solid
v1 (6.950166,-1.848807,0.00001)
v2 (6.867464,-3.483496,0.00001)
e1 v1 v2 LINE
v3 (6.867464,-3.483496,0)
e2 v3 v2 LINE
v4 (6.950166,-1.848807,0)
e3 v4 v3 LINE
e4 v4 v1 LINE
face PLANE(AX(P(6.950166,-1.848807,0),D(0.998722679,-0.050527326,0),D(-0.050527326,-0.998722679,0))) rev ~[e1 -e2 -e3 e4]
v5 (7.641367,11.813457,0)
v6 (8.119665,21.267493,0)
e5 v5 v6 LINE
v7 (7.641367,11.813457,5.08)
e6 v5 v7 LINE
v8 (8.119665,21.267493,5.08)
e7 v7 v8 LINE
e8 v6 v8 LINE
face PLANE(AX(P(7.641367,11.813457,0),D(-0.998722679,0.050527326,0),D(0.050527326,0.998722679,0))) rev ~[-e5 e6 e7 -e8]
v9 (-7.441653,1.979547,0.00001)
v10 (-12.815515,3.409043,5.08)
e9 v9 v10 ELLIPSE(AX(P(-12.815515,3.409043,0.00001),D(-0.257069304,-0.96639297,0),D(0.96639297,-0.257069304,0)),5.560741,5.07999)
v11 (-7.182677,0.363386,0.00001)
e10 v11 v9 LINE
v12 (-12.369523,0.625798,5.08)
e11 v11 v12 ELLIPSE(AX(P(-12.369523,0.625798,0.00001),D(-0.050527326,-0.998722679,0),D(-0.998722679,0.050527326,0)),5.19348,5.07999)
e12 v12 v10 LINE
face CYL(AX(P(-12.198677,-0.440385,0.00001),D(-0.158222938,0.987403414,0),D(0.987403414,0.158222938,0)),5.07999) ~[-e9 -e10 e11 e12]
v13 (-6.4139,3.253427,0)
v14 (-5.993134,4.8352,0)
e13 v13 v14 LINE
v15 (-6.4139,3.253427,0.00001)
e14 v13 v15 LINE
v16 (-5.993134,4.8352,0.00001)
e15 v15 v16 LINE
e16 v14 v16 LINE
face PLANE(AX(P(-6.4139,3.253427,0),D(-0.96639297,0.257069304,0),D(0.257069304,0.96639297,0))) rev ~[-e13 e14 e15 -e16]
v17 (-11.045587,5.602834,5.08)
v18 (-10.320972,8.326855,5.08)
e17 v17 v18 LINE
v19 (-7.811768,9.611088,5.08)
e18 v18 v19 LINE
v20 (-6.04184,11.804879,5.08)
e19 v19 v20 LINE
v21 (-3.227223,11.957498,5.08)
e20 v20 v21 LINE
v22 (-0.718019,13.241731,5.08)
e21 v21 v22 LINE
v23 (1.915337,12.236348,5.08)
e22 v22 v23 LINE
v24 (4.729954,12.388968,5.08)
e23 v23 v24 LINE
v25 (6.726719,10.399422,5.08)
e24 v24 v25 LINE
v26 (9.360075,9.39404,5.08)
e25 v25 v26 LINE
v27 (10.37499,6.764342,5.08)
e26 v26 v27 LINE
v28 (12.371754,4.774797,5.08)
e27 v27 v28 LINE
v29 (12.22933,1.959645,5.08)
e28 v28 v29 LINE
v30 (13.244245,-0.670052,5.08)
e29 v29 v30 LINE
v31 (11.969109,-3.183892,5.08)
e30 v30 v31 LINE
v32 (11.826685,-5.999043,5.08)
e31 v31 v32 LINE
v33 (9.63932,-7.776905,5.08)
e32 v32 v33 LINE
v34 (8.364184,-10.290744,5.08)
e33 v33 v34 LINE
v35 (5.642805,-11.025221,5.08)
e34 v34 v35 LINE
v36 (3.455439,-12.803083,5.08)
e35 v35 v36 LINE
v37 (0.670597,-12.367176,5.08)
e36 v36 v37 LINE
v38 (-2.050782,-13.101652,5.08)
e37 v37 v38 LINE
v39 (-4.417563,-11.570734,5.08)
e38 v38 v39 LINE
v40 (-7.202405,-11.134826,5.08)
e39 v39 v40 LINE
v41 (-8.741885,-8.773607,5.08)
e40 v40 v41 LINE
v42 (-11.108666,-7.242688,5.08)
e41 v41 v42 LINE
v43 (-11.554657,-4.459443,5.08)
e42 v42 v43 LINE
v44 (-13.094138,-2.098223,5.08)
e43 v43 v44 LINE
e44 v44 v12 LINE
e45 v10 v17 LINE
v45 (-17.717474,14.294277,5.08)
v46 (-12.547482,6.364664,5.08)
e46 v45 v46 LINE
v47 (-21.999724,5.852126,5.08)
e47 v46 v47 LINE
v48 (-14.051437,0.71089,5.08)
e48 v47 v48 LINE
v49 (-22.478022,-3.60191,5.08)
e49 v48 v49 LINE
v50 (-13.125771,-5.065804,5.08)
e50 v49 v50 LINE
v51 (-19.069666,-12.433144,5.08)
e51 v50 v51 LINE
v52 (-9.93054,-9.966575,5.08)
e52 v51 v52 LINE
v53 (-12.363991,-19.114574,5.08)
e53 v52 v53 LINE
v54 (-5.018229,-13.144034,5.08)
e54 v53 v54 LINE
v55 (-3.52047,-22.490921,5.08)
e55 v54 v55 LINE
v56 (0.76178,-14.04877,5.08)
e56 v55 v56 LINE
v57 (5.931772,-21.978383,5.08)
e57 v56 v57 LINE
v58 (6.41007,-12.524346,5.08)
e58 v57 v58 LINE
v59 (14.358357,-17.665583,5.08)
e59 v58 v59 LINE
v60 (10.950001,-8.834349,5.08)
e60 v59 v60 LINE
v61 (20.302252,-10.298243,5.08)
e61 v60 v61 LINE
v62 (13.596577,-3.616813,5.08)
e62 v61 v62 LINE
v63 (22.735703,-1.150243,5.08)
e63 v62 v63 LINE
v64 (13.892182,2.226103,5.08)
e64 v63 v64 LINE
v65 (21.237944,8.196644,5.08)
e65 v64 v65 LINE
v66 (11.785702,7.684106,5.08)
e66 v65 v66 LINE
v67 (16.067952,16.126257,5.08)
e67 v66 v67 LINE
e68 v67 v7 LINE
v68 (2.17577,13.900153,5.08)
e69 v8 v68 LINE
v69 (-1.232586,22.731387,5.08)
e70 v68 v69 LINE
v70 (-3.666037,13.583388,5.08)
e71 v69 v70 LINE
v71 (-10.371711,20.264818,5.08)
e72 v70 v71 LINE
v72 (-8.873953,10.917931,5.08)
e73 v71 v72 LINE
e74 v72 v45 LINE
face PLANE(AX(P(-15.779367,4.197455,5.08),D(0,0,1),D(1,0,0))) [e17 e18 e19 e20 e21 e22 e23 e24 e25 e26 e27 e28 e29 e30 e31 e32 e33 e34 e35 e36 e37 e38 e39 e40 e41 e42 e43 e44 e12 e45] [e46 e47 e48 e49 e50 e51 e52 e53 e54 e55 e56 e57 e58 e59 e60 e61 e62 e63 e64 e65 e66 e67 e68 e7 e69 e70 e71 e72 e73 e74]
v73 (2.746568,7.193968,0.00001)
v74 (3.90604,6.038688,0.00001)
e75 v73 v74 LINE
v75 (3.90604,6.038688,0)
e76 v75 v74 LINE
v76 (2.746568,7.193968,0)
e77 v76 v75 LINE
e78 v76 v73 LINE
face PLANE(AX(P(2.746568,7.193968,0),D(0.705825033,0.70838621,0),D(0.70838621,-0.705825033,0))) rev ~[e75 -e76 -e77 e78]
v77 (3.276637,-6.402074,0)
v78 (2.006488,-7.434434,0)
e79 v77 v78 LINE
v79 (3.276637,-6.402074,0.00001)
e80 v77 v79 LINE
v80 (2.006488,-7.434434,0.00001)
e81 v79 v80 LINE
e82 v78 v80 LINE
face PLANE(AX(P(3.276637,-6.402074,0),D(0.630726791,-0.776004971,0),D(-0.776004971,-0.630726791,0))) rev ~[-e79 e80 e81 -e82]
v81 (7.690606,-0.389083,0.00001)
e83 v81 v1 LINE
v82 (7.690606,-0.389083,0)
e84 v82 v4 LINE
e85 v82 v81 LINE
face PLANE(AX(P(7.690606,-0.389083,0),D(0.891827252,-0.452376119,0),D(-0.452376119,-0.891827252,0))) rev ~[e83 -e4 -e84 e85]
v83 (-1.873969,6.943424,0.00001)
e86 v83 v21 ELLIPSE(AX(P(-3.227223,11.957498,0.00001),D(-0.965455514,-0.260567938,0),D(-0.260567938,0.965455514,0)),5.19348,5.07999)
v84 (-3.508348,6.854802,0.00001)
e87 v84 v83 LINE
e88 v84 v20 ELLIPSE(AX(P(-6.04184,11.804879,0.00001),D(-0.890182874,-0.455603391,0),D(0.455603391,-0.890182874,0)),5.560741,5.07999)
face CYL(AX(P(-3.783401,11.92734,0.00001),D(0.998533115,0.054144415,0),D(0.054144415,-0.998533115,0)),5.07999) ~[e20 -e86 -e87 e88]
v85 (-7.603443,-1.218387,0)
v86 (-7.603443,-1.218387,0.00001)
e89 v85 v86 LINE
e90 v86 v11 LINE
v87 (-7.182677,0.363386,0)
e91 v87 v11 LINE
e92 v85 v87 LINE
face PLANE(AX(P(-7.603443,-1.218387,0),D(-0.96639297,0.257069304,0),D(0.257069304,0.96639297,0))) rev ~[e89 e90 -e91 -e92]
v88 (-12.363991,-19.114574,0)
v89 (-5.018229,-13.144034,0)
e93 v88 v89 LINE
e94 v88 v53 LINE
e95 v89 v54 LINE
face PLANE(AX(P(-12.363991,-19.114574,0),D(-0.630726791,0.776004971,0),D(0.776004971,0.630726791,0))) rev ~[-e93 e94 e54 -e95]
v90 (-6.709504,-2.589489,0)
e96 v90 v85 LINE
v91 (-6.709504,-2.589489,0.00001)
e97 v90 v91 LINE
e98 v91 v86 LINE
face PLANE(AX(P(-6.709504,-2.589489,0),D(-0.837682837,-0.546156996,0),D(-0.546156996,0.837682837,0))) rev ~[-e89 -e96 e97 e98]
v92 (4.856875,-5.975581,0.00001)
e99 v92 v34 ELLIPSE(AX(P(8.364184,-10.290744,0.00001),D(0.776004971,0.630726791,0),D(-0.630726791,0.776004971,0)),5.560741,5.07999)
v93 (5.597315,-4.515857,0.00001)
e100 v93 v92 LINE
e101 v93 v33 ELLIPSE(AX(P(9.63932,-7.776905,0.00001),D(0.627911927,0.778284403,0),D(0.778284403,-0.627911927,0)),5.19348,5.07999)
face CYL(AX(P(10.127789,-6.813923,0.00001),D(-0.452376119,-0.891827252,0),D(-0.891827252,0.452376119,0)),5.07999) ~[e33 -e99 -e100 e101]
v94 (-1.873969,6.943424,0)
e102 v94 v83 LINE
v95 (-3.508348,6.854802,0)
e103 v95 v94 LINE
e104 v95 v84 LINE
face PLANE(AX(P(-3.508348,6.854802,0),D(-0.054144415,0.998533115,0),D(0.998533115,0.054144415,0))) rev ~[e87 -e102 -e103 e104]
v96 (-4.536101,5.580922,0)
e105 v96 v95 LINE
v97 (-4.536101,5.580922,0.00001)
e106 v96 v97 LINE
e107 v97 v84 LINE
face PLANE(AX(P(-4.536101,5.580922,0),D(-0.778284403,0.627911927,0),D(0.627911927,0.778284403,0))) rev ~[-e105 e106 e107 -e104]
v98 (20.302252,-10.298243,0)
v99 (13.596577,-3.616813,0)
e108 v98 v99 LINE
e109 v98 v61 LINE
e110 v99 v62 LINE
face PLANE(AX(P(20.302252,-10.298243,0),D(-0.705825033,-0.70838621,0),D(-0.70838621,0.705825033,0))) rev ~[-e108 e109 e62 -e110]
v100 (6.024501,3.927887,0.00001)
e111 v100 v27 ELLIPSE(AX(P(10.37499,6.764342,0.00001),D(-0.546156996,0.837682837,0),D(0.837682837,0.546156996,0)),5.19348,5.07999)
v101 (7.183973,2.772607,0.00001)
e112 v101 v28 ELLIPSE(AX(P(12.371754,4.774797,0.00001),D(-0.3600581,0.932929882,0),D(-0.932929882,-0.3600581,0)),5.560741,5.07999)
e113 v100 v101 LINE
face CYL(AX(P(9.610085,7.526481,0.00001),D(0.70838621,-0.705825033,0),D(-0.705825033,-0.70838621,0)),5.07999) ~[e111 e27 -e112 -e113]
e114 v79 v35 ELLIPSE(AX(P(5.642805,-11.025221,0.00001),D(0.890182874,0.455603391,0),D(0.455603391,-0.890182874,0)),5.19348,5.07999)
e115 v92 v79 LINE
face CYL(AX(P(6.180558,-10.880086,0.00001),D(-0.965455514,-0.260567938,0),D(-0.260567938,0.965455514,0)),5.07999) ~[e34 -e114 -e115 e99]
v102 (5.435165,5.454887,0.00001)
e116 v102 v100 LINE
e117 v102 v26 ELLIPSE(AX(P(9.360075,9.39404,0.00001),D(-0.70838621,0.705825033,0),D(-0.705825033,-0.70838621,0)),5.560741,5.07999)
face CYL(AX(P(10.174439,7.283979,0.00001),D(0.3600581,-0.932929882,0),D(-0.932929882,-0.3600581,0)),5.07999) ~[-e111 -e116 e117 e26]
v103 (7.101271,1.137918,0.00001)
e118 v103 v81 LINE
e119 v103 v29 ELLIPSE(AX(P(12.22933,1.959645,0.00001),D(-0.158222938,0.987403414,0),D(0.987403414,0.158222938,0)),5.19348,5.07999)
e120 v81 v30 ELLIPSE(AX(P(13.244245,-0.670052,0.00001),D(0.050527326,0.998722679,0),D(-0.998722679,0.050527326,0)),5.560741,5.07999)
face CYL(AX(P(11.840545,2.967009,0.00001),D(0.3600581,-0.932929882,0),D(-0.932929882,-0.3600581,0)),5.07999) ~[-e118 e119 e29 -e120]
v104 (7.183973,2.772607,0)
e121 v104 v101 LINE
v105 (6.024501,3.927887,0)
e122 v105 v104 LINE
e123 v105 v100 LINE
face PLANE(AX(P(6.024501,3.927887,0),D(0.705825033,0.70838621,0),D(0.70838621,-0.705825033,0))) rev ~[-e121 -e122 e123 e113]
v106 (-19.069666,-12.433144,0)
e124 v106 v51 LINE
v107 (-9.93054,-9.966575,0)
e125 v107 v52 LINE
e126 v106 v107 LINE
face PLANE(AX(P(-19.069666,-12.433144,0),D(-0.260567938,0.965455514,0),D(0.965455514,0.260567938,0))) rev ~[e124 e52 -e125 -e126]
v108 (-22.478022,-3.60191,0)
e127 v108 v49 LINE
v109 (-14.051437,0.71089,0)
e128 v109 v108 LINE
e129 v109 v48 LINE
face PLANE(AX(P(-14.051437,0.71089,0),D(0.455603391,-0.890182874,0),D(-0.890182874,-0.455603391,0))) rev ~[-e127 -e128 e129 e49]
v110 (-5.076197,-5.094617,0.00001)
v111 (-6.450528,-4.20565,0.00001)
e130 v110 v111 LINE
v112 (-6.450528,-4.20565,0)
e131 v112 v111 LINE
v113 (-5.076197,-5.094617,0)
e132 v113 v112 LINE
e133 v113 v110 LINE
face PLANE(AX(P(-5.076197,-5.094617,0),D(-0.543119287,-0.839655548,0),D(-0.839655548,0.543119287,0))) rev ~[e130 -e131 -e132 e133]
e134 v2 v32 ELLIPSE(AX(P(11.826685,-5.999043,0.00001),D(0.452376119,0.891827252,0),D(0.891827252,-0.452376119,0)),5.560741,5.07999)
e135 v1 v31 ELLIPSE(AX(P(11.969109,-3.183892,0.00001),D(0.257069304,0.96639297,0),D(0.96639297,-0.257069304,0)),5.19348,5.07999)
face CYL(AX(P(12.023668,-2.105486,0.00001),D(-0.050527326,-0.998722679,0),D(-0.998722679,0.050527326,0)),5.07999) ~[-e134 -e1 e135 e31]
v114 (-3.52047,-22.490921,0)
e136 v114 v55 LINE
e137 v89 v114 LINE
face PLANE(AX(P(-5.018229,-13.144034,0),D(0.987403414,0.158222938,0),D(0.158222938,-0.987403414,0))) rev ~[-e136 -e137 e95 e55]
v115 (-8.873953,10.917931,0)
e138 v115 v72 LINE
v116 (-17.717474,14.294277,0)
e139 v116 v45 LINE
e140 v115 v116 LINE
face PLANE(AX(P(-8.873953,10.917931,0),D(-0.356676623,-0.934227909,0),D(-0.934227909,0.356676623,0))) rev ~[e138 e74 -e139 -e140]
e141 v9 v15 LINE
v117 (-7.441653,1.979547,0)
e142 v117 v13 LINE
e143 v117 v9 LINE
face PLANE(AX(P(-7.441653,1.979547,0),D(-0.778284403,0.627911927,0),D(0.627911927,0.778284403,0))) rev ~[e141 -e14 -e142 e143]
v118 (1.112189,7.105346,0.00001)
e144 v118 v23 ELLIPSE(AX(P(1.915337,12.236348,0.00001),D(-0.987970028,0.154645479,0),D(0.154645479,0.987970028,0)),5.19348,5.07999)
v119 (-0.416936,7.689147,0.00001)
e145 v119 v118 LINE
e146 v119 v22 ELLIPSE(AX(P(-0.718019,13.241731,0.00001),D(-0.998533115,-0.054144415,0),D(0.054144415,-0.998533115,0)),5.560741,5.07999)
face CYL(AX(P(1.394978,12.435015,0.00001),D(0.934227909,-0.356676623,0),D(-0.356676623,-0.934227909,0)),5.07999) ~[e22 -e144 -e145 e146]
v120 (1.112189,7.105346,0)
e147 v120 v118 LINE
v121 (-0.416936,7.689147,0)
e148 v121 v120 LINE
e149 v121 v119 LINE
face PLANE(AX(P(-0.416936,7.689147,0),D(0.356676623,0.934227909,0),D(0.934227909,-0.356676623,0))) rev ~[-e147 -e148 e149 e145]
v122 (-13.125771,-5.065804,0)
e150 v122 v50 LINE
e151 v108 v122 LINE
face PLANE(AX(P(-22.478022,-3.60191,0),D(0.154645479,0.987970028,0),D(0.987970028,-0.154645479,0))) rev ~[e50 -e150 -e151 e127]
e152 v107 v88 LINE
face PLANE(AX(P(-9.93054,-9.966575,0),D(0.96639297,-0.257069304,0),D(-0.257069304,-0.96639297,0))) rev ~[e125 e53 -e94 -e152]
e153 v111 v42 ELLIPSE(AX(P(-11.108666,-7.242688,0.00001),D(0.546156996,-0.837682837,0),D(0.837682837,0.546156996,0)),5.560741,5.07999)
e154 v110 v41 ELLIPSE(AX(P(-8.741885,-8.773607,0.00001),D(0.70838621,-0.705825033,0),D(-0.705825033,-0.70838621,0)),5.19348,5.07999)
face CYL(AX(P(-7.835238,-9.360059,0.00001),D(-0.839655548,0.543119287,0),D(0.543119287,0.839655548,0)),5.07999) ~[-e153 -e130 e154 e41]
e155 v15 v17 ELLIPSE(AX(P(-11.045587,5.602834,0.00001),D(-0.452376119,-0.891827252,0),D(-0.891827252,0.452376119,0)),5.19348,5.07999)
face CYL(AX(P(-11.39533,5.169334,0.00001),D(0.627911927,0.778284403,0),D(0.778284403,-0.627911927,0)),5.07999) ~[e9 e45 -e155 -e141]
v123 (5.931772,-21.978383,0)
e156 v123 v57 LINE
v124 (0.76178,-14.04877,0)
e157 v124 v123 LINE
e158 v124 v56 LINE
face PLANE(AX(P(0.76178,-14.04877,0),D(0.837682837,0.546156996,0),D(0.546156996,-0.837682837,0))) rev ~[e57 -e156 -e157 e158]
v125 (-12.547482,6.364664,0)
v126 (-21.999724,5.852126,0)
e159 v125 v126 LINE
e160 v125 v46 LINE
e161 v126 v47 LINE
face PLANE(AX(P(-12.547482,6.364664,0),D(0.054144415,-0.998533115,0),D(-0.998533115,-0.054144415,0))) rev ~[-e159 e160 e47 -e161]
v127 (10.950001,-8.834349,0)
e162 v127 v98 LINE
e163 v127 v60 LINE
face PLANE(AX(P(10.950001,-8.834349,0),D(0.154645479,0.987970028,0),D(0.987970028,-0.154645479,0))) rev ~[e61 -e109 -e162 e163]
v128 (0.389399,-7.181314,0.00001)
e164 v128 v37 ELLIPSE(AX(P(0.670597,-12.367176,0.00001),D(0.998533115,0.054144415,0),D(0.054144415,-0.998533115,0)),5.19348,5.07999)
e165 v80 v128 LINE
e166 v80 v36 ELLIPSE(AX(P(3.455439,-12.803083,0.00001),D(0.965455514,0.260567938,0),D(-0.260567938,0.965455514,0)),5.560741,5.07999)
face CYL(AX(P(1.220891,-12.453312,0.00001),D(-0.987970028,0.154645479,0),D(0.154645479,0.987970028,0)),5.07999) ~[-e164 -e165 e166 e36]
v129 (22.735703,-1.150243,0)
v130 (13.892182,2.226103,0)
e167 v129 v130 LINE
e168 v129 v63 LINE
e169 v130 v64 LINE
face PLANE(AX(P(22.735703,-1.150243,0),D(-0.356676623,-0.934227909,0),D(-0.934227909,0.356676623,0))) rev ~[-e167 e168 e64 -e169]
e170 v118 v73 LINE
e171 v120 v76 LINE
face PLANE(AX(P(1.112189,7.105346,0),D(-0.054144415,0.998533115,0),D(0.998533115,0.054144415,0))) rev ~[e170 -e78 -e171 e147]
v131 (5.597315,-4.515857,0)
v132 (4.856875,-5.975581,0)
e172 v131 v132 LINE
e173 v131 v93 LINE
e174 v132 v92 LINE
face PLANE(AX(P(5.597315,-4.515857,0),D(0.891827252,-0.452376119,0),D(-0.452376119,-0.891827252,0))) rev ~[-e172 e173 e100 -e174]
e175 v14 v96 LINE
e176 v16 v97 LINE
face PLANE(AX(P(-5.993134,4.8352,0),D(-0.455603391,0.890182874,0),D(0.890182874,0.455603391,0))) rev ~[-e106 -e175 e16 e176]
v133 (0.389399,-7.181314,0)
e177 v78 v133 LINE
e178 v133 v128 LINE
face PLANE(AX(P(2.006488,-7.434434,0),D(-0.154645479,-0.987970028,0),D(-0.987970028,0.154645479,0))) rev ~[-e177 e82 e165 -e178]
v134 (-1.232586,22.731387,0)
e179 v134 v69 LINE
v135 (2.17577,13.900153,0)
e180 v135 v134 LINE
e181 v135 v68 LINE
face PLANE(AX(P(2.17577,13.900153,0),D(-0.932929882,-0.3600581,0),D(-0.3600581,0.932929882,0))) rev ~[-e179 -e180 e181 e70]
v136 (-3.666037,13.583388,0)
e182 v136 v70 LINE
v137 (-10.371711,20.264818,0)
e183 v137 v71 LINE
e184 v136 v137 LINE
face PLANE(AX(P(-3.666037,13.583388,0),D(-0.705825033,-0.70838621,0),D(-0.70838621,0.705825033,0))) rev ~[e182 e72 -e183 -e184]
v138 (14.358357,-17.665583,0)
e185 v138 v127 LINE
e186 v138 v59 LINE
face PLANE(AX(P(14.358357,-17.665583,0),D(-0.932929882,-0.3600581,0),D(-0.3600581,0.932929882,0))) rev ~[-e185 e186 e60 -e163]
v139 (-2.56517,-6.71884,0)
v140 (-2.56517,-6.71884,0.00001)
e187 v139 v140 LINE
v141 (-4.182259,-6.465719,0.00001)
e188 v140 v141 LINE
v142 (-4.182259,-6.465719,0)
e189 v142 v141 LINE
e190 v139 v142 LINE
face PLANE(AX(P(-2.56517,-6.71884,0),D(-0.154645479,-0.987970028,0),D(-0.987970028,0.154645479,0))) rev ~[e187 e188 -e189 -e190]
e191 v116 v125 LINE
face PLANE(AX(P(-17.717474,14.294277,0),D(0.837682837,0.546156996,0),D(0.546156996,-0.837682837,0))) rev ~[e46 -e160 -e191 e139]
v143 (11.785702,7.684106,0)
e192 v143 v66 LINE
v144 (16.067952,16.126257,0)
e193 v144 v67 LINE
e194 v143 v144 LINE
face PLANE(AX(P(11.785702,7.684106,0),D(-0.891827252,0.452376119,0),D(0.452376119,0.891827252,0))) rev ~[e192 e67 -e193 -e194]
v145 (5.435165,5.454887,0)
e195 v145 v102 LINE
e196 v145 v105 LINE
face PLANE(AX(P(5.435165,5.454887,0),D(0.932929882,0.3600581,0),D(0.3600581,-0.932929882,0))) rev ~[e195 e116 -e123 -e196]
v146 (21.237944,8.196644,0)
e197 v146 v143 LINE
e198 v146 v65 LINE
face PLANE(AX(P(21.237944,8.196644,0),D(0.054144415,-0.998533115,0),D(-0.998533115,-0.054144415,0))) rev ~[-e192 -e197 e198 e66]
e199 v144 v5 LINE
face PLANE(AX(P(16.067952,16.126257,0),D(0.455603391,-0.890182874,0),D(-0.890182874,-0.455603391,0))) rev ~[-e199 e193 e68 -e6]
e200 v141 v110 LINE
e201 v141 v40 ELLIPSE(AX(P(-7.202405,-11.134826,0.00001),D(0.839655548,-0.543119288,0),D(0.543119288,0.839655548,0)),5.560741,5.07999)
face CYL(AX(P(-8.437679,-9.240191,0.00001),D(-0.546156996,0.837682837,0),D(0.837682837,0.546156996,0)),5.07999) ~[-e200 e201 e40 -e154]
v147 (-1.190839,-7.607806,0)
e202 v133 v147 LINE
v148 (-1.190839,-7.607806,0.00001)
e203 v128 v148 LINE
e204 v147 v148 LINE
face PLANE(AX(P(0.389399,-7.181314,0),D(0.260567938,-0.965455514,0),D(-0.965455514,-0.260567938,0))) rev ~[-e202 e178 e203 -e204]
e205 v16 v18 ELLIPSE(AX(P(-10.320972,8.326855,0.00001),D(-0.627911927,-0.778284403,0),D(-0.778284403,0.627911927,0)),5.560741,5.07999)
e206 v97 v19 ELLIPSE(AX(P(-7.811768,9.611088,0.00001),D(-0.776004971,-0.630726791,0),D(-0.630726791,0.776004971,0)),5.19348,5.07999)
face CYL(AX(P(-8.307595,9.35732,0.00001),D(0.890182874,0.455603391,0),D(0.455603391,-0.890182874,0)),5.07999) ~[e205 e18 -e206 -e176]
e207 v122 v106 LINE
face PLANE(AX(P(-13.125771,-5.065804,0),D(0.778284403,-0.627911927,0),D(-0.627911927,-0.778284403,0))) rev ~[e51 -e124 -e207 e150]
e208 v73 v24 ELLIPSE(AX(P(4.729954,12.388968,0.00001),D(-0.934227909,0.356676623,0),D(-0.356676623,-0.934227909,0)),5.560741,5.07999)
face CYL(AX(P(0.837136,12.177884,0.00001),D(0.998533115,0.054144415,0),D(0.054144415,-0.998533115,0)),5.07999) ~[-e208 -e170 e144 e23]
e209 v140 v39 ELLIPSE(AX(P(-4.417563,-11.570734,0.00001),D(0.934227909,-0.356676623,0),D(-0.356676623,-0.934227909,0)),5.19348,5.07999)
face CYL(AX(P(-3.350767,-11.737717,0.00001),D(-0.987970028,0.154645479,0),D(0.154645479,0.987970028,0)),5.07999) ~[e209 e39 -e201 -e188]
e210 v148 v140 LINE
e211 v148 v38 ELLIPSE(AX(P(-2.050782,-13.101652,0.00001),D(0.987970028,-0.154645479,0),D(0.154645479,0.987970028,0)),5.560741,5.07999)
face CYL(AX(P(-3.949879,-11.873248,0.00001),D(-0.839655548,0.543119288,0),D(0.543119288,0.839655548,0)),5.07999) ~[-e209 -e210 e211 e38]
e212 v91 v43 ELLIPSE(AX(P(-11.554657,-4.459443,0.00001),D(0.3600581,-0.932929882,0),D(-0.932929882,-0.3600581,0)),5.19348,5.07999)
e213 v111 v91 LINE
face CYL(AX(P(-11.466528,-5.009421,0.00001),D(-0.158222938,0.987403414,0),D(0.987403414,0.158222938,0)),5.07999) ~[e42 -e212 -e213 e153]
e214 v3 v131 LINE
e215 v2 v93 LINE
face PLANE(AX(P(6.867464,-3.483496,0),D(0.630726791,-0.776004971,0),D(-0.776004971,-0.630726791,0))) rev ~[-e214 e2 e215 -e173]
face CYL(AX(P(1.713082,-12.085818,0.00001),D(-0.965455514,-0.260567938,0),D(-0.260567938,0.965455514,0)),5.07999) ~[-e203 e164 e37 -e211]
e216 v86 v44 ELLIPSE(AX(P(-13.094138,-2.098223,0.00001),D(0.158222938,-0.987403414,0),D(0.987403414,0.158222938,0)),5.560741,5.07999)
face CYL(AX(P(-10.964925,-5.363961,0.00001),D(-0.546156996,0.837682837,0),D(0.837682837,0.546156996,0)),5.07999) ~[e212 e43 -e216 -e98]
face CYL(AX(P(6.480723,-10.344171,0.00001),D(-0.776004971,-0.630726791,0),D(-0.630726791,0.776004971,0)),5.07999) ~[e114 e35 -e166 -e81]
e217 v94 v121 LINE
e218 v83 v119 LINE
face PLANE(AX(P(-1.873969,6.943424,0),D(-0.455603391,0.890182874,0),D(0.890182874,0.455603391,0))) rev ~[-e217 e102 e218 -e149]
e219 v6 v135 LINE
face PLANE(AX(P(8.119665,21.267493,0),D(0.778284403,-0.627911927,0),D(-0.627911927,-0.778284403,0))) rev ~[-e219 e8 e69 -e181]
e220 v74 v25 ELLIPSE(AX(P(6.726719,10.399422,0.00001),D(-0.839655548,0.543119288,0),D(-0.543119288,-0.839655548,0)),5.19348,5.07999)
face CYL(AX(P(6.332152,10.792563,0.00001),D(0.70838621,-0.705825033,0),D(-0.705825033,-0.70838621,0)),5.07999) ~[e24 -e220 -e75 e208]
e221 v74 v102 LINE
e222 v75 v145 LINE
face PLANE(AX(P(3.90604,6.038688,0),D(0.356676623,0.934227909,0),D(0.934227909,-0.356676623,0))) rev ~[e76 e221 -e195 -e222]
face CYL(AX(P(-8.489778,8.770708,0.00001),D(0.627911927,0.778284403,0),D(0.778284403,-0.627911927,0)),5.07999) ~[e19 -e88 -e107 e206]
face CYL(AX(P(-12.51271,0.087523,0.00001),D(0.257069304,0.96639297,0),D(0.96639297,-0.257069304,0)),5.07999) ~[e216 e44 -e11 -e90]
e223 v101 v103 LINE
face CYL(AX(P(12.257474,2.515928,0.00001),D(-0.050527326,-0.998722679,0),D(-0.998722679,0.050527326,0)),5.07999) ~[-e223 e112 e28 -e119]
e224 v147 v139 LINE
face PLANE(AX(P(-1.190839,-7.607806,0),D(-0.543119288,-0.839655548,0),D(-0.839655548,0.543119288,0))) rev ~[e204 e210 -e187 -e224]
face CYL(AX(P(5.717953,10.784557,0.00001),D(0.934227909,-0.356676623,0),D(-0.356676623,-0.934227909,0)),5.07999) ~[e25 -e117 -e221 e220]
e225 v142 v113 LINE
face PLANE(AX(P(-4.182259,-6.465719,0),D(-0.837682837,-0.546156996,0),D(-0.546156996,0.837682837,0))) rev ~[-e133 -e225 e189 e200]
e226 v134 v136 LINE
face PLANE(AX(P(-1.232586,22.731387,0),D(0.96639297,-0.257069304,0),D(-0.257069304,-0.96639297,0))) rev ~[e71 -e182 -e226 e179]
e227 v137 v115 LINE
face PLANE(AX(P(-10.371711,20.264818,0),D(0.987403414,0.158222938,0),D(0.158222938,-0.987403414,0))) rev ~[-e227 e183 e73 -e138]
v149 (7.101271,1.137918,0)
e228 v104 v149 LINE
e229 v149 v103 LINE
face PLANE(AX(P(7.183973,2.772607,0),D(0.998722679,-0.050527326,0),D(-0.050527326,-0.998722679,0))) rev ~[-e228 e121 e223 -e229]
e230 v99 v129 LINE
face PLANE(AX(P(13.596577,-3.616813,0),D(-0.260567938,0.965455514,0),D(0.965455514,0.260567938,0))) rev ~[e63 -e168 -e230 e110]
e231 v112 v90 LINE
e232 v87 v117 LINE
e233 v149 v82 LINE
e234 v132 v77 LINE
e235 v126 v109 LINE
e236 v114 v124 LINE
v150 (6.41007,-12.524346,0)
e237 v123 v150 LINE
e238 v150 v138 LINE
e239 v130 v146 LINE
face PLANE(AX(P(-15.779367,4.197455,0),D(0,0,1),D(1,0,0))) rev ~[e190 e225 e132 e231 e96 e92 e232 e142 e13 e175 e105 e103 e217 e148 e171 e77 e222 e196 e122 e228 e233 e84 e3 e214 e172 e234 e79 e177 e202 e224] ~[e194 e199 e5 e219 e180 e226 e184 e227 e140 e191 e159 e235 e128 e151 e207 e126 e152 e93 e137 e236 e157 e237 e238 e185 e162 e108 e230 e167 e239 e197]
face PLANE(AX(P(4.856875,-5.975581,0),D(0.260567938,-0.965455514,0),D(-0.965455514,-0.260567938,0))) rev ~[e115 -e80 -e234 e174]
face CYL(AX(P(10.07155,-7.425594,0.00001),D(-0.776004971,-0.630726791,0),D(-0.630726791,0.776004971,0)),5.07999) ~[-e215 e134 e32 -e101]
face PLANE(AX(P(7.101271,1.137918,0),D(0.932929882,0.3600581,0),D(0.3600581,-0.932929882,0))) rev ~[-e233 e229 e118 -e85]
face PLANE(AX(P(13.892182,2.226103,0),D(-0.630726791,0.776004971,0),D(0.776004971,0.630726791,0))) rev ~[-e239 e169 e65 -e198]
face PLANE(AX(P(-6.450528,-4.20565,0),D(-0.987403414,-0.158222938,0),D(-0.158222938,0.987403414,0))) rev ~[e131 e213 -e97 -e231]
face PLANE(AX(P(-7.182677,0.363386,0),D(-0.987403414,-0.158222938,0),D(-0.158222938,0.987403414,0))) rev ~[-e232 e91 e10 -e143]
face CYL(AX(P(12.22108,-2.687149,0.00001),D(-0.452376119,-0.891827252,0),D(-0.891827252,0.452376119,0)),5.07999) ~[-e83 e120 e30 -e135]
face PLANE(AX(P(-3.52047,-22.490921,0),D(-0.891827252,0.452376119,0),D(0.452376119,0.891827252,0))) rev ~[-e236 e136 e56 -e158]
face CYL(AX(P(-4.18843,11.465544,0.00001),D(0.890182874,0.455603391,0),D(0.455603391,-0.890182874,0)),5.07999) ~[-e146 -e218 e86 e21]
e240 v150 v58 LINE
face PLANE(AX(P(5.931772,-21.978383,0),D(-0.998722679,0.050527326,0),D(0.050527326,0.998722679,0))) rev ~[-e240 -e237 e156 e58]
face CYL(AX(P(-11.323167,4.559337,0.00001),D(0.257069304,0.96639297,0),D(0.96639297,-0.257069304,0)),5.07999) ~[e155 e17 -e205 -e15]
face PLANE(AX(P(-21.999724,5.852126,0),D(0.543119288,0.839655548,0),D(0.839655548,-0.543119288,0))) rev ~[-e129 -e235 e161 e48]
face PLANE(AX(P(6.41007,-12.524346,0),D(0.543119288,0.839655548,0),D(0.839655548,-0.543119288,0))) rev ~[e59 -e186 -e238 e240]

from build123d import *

# Parameters (mm, degrees)
F1_DEPTH = 5.08
F2_R     = 5.07999


# Not quite as in the source:
# - a fillet or chamfer is up to 0.001 mm smaller than in the source, because OpenCascade refuses the exact size


with BuildPart() as f1:
    # F0 (on Top) → F1 (new body)
    with BuildSketch(Plane.XY):
        Polygon((-21.999723834, 5.8521262697), (-14.0514369357, 0.7108895722), (-10.1598827967, 2.7026210629), (-12.5474815477, 6.3646642291), align=None)
        Polygon((-22.4780219717, -3.6019104497), (-13.1257712241, -5.0658043501), (-10.3807697977, -1.6634294271), (-14.0514369357, 0.7108895722), align=None)
        Polygon((-19.0696659041, -12.4331441299), (-9.930540424, -9.9665746788), (-8.8067273944, -5.7418578572), (-13.1257712241, -5.0658043501), align=None)
        Polygon((-9.930540424, -9.9665746788), (-12.3639913592, -19.1145742385), (-5.0182289685, -13.144033702), (-5.7099218179, -8.8274669008), align=None)
        Polygon((-1.6258188862, -10.3867267222), (-5.0182289685, -13.144033702), (-3.5204703849, -22.4909208108), (0.7617798649, -14.0487698884), align=None)
        Polygon((2.7394029011, -10.1500271328), (0.7617798649, -14.0487698884), (5.9317719013, -21.9783828513), (6.4100700391, -12.524346132), align=None)
        Polygon((6.6309570401, -8.1582956421), (6.4100700391, -12.524346132), (14.3583569374, -17.6655828295), (10.9500008698, -8.8343491493), align=None)
        Polygon((9.3759584665, -4.7559207191), (10.9500008698, -8.8343491493), (20.3022516175, -10.2982430497), (13.5965770725, -3.6168129411), align=None)
        Polygon((10.4997714961, -0.5312038976), (13.5965770725, -3.6168129411), (22.7357025527, -1.15024349), (13.8921815784, 2.2261030823), align=None)
        Polygon((9.8080786466, 3.7853629037), (13.8921815784, 2.2261030823), (21.2379439691, 8.1966436188), (11.7857016829, 7.6841056593), align=None)
        Polygon((7.6413668966, 11.8134565599), (7.4204798956, 7.44740607), (11.7857016829, 7.6841056593), (16.0679519327, 16.1262565817), align=None)
        Polygon((8.1196650343, 21.2674932792), (2.1757703543, 13.9001534994), (3.7498127576, 9.8217250692), (7.6413668966, 11.8134565599), align=None)
        Polygon((-1.2325857133, 22.7313871796), (-3.6660366485, 13.5833876199), (-0.5692310721, 10.4977785763), (2.1757703543, 13.9001534994), align=None)
        Polygon((-8.8739526099, 10.9179306197), (-4.7898496782, 9.3586707984), (-3.6660366485, 13.5833876199), (-10.3717111935, 20.2648177285), align=None)
        Polygon((-17.7174735842, 14.294277192), (-12.5474815477, 6.3646642291), (-8.1822597605, 6.6013638185), (-8.8739526099, 10.9179306197), align=None)
        Polygon((-12.5474815477, 6.3646642291), (-10.1598827967, 2.7026210629), (-7.7547700697, 3.9335788206), (-8.1822597605, 6.6013638185), align=None)
        Polygon((-14.0514369357, 0.7108895722), (-10.3807697977, -1.6634294271), (-8.684265617, 0.4393539178), (-10.1598827967, 2.7026210629), align=None)
        Polygon((-13.1257712241, -5.0658043501), (-8.8067273944, -5.7418578572), (-8.112172745, -3.1308392687), (-10.3807697977, -1.6634294271), align=None)
        Polygon((-8.8067273944, -5.7418578572), (-9.930540424, -9.9665746788), (-5.7099218179, -8.8274669008), (-6.1374115087, -6.1596819029), align=None)
        Polygon((-5.7099218179, -8.8274669008), (-5.0182289685, -13.144033702), (-1.6258188862, -10.3867267222), (-3.1014360658, -8.1234595771), align=None)
        Polygon((0.4708058484, -8.6826172912), (-1.6258188862, -10.3867267222), (0.7617798649, -14.0487698884), (2.7394029011, -10.1500271328), align=None)
        Polygon((3.9616411544, -7.7404715965), (2.7394029011, -10.1500271328), (6.4100700391, -12.524346132), (6.6309570401, -8.1582956421), align=None)
        Polygon((6.7674727144, -5.4599280427), (6.6309570401, -8.1582956421), (10.9500008698, -8.8343491493), (9.3759584665, -4.7559207191), align=None)
        Polygon((8.4031467615, -2.2353133286), (9.3759584665, -4.7559207191), (13.5965770725, -3.6168129411), (10.4997714961, -0.5312038976), align=None)
        Polygon((8.5858403933, 1.3758073673), (10.4997714961, -0.5312038976), (13.8921815784, 2.2261030823), (9.8080786466, 3.7853629037), align=None)
        Polygon((7.4204798956, 7.44740607), (7.2839642213, 4.7490384706), (9.8080786466, 3.7853629037), (11.7857016829, 7.6841056593), align=None)
        Polygon((3.7498127576, 9.8217250692), (4.7226244626, 7.3011176786), (7.4204798956, 7.44740607), (7.6413668966, 11.8134565599), align=None)
        Polygon((2.1757703543, 13.9001534994), (-0.5692310721, 10.4977785763), (1.3447000307, 8.5907673114), (3.7498127576, 9.8217250692), align=None)
        Polygon((-3.6660366485, 13.5833876199), (-4.7898496782, 9.3586707984), (-2.2657352528, 8.3949952315), (-0.5692310721, 10.4977785763), align=None)
        Polygon((-8.1822597605, 6.6013638185), (-5.4844043275, 6.7476522098), (-4.7898496782, 9.3586707984), (-8.8739526099, 10.9179306197), align=None)
        Polygon((-10.1598827967, 2.7026210629), (-8.684265617, 0.4393539178), (-7.4416532636, 1.979547329), (-7.7547700697, 3.9335788206), align=None)
        Polygon((-10.3807697977, -1.6634294271), (-8.112172745, -3.1308392687), (-7.6034429717, -1.2183865968), (-8.684265617, 0.4393539178), align=None)
        Polygon((-8.112172745, -3.1308392687), (-8.8067273944, -5.7418578572), (-6.1374115087, -6.1596819029), (-6.4505283149, -4.2056504113), align=None)
        Polygon((-6.1374115087, -6.1596819029), (-5.7099218179, -8.8274669008), (-3.1014360658, -8.1234595771), (-4.1822587112, -6.4657190625), align=None)
        Polygon((-3.1014360658, -8.1234595771), (-1.6258188862, -10.3867267222), (0.4708058484, -8.6826172912), (-1.1908385817, -7.6078061486), align=None)
        Polygon((2.0064883569, -7.4344344369), (0.4708058484, -8.6826172912), (2.7394029011, -10.1500271328), (3.9616411544, -7.7404715965), align=None)
        Polygon((4.8568752303, -5.9755814713), (3.9616411544, -7.7404715965), (6.6309570401, -8.1582956421), (6.7674727144, -5.4599280427), align=None)
        Polygon((6.867464253, -3.4834961829), (6.7674727144, -5.4599280427), (9.3759584665, -4.7559207191), (8.4031467615, -2.2353133286), align=None)
        Polygon((7.6906063175, -0.3890827578), (8.4031467615, -2.2353133286), (10.4997714961, -0.5312038976), (8.5858403933, 1.3758073673), align=None)
        Polygon((7.2839642213, 4.7490384706), (7.1839726826, 2.7726066107), (8.5858403933, 1.3758073673), (9.8080786466, 3.7853629037), align=None)
        Polygon((4.7226244626, 7.3011176786), (5.4351649066, 5.4548871079), (7.2839642213, 4.7490384706), (7.4204798956, 7.44740607), align=None)
        Polygon((-0.5692310721, 10.4977785763), (-2.2657352528, 8.3949952315), (-0.4169359382, 7.6891465941), (1.3447000307, 8.5907673114), align=None)
        Polygon((-4.7898496782, 9.3586707984), (-5.4844043275, 6.7476522098), (-3.5083476063, 6.8548018203), (-2.2657352528, 8.3949952315), align=None)
        Polygon((-7.4416532636, 1.979547329), (-6.4138998748, 3.2534273071), (-5.9931341009, 4.8351995379), (-7.7547700697, 3.9335788206), align=None)
        Polygon((-8.684265617, 0.4393539178), (-7.6034429717, -1.2183865968), (-7.1826771978, 0.363385634), (-7.4416532636, 1.979547329), align=None)
        Polygon((-7.6034429717, -1.2183865968), (-8.112172745, -3.1308392687), (-6.4505283149, -4.2056504113), (-6.7095043807, -2.5894887164), align=None)
        Polygon((-6.4505283149, -4.2056504113), (-6.1374115087, -6.1596819029), (-4.1822587112, -6.4657190625), (-5.0761973022, -5.0946169429), align=None)
        Polygon((-4.1822587112, -6.4657190625), (-3.1014360658, -8.1234595771), (-1.1908385817, -7.6078061486), (-2.5651695944, -6.7188396169), align=None)
        Polygon((-1.1908385817, -7.6078061486), (0.4708058484, -8.6826172912), (2.0064883569, -7.4344344369), (0.3893992401, -7.1813138824), align=None)
        Polygon((3.2766374084, -6.4020737375), (2.0064883569, -7.4344344369), (3.9616411544, -7.7404715965), (4.8568752303, -5.9755814713), align=None)
        Polygon((5.5973152015, -4.5158568823), (4.8568752303, -5.9755814713), (6.7674727144, -5.4599280427), (6.867464253, -3.4834961829), align=None)
        Polygon((6.9501663462, -1.8488073469), (6.867464253, -3.4834961829), (8.4031467615, -2.2353133286), (7.6906063175, -0.3890827578), align=None)
        Polygon((7.1839726826, 2.7726066107), (7.1012705894, 1.1379177747), (7.6906063175, -0.3890827578), (8.5858403933, 1.3758073673), align=None)
        Polygon((1.3447000307, 8.5907673114), (2.7465677414, 7.1939680681), (4.7226244626, 7.3011176786), (3.7498127576, 9.8217250692), align=None)
        Polygon((4.7226244626, 7.3011176786), (2.7465677414, 7.1939680681), (3.9060397893, 6.0386881034), (5.4351649066, 5.4548871079), align=None)
        Polygon((-0.4169359382, 7.6891465941), (1.1121891791, 7.1053455986), (2.7465677414, 7.1939680681), (1.3447000307, 8.5907673114), align=None)
        Polygon((-2.2657352528, 8.3949952315), (-3.5083476063, 6.8548018203), (-1.873969044, 6.9434242898), (-0.4169359382, 7.6891465941), align=None)
        Polygon((-5.4844043275, 6.7476522098), (-5.9931341009, 4.8351995379), (-4.536100995, 5.5809218422), (-3.5083476063, 6.8548018203), align=None)
        Polygon((-7.7547700697, 3.9335788206), (-5.9931341009, 4.8351995379), (-5.4844043275, 6.7476522098), (-8.1822597605, 6.6013638185), align=None)
        Polygon((5.4351649066, 5.4548871079), (6.0245006347, 3.9278865754), (7.1839726826, 2.7726066107), (7.2839642213, 4.7490384706), align=None)
    extrude(amount=F1_DEPTH)

    # F2 (radius 5.08 in the source; OpenCascade refuses exactly that, so slightly less here)
    f2_edges = [f1.edges().sort_by_distance(p)[0] for p in [
        (-6.203517, 4.044313, 5.08),
        (-6.927777, 2.616487, 5.08),
        (-7.312165, 1.171466, 5.08),
        (-7.39306, -0.4275, 5.08),
        (-7.156474, -1.903938, 5.08),
        (-6.580016, -3.39757, 5.08),
        (-5.763363, -4.650134, 5.08),
        (-4.629228, -5.780168, 5.08),
        (-3.373714, -6.592279, 5.08),
        (-1.878004, -7.163323, 5.08),
        (-0.40072, -7.39456, 5.08),
        (1.197944, -7.307874, 5.08),
        (2.641563, -6.918254, 5.08),
        (4.066756, -6.188828, 5.08),
        (5.227095, -5.245719, 5.08),
        (6.908815, -2.666152, 5.08),
        (7.320386, -1.118945, 5.08),
        (7.395938, 0.374418, 5.08),
        (7.142622, 1.955262, 5.08),
        (6.604237, 3.350247, 5.08),
        (3.326304, 6.616328, 5.08),
        (5.729833, 4.691387, 5.08),
        (4.670602, 5.746788, 5.08),
        (1.929378, 7.149657, 5.08),
        (0.347627, 7.397246, 5.08),
        (-1.145452, 7.316285, 5.08),
        (-2.691158, 6.899113, 5.08),
        (-4.022224, 6.217862, 5.08),
        (-5.264618, 5.208061, 5.08),
        (6.23239, -3.999677, 5.08),
    ]]
    fillet(f2_edges, radius=F2_R)


solid = f1.part
